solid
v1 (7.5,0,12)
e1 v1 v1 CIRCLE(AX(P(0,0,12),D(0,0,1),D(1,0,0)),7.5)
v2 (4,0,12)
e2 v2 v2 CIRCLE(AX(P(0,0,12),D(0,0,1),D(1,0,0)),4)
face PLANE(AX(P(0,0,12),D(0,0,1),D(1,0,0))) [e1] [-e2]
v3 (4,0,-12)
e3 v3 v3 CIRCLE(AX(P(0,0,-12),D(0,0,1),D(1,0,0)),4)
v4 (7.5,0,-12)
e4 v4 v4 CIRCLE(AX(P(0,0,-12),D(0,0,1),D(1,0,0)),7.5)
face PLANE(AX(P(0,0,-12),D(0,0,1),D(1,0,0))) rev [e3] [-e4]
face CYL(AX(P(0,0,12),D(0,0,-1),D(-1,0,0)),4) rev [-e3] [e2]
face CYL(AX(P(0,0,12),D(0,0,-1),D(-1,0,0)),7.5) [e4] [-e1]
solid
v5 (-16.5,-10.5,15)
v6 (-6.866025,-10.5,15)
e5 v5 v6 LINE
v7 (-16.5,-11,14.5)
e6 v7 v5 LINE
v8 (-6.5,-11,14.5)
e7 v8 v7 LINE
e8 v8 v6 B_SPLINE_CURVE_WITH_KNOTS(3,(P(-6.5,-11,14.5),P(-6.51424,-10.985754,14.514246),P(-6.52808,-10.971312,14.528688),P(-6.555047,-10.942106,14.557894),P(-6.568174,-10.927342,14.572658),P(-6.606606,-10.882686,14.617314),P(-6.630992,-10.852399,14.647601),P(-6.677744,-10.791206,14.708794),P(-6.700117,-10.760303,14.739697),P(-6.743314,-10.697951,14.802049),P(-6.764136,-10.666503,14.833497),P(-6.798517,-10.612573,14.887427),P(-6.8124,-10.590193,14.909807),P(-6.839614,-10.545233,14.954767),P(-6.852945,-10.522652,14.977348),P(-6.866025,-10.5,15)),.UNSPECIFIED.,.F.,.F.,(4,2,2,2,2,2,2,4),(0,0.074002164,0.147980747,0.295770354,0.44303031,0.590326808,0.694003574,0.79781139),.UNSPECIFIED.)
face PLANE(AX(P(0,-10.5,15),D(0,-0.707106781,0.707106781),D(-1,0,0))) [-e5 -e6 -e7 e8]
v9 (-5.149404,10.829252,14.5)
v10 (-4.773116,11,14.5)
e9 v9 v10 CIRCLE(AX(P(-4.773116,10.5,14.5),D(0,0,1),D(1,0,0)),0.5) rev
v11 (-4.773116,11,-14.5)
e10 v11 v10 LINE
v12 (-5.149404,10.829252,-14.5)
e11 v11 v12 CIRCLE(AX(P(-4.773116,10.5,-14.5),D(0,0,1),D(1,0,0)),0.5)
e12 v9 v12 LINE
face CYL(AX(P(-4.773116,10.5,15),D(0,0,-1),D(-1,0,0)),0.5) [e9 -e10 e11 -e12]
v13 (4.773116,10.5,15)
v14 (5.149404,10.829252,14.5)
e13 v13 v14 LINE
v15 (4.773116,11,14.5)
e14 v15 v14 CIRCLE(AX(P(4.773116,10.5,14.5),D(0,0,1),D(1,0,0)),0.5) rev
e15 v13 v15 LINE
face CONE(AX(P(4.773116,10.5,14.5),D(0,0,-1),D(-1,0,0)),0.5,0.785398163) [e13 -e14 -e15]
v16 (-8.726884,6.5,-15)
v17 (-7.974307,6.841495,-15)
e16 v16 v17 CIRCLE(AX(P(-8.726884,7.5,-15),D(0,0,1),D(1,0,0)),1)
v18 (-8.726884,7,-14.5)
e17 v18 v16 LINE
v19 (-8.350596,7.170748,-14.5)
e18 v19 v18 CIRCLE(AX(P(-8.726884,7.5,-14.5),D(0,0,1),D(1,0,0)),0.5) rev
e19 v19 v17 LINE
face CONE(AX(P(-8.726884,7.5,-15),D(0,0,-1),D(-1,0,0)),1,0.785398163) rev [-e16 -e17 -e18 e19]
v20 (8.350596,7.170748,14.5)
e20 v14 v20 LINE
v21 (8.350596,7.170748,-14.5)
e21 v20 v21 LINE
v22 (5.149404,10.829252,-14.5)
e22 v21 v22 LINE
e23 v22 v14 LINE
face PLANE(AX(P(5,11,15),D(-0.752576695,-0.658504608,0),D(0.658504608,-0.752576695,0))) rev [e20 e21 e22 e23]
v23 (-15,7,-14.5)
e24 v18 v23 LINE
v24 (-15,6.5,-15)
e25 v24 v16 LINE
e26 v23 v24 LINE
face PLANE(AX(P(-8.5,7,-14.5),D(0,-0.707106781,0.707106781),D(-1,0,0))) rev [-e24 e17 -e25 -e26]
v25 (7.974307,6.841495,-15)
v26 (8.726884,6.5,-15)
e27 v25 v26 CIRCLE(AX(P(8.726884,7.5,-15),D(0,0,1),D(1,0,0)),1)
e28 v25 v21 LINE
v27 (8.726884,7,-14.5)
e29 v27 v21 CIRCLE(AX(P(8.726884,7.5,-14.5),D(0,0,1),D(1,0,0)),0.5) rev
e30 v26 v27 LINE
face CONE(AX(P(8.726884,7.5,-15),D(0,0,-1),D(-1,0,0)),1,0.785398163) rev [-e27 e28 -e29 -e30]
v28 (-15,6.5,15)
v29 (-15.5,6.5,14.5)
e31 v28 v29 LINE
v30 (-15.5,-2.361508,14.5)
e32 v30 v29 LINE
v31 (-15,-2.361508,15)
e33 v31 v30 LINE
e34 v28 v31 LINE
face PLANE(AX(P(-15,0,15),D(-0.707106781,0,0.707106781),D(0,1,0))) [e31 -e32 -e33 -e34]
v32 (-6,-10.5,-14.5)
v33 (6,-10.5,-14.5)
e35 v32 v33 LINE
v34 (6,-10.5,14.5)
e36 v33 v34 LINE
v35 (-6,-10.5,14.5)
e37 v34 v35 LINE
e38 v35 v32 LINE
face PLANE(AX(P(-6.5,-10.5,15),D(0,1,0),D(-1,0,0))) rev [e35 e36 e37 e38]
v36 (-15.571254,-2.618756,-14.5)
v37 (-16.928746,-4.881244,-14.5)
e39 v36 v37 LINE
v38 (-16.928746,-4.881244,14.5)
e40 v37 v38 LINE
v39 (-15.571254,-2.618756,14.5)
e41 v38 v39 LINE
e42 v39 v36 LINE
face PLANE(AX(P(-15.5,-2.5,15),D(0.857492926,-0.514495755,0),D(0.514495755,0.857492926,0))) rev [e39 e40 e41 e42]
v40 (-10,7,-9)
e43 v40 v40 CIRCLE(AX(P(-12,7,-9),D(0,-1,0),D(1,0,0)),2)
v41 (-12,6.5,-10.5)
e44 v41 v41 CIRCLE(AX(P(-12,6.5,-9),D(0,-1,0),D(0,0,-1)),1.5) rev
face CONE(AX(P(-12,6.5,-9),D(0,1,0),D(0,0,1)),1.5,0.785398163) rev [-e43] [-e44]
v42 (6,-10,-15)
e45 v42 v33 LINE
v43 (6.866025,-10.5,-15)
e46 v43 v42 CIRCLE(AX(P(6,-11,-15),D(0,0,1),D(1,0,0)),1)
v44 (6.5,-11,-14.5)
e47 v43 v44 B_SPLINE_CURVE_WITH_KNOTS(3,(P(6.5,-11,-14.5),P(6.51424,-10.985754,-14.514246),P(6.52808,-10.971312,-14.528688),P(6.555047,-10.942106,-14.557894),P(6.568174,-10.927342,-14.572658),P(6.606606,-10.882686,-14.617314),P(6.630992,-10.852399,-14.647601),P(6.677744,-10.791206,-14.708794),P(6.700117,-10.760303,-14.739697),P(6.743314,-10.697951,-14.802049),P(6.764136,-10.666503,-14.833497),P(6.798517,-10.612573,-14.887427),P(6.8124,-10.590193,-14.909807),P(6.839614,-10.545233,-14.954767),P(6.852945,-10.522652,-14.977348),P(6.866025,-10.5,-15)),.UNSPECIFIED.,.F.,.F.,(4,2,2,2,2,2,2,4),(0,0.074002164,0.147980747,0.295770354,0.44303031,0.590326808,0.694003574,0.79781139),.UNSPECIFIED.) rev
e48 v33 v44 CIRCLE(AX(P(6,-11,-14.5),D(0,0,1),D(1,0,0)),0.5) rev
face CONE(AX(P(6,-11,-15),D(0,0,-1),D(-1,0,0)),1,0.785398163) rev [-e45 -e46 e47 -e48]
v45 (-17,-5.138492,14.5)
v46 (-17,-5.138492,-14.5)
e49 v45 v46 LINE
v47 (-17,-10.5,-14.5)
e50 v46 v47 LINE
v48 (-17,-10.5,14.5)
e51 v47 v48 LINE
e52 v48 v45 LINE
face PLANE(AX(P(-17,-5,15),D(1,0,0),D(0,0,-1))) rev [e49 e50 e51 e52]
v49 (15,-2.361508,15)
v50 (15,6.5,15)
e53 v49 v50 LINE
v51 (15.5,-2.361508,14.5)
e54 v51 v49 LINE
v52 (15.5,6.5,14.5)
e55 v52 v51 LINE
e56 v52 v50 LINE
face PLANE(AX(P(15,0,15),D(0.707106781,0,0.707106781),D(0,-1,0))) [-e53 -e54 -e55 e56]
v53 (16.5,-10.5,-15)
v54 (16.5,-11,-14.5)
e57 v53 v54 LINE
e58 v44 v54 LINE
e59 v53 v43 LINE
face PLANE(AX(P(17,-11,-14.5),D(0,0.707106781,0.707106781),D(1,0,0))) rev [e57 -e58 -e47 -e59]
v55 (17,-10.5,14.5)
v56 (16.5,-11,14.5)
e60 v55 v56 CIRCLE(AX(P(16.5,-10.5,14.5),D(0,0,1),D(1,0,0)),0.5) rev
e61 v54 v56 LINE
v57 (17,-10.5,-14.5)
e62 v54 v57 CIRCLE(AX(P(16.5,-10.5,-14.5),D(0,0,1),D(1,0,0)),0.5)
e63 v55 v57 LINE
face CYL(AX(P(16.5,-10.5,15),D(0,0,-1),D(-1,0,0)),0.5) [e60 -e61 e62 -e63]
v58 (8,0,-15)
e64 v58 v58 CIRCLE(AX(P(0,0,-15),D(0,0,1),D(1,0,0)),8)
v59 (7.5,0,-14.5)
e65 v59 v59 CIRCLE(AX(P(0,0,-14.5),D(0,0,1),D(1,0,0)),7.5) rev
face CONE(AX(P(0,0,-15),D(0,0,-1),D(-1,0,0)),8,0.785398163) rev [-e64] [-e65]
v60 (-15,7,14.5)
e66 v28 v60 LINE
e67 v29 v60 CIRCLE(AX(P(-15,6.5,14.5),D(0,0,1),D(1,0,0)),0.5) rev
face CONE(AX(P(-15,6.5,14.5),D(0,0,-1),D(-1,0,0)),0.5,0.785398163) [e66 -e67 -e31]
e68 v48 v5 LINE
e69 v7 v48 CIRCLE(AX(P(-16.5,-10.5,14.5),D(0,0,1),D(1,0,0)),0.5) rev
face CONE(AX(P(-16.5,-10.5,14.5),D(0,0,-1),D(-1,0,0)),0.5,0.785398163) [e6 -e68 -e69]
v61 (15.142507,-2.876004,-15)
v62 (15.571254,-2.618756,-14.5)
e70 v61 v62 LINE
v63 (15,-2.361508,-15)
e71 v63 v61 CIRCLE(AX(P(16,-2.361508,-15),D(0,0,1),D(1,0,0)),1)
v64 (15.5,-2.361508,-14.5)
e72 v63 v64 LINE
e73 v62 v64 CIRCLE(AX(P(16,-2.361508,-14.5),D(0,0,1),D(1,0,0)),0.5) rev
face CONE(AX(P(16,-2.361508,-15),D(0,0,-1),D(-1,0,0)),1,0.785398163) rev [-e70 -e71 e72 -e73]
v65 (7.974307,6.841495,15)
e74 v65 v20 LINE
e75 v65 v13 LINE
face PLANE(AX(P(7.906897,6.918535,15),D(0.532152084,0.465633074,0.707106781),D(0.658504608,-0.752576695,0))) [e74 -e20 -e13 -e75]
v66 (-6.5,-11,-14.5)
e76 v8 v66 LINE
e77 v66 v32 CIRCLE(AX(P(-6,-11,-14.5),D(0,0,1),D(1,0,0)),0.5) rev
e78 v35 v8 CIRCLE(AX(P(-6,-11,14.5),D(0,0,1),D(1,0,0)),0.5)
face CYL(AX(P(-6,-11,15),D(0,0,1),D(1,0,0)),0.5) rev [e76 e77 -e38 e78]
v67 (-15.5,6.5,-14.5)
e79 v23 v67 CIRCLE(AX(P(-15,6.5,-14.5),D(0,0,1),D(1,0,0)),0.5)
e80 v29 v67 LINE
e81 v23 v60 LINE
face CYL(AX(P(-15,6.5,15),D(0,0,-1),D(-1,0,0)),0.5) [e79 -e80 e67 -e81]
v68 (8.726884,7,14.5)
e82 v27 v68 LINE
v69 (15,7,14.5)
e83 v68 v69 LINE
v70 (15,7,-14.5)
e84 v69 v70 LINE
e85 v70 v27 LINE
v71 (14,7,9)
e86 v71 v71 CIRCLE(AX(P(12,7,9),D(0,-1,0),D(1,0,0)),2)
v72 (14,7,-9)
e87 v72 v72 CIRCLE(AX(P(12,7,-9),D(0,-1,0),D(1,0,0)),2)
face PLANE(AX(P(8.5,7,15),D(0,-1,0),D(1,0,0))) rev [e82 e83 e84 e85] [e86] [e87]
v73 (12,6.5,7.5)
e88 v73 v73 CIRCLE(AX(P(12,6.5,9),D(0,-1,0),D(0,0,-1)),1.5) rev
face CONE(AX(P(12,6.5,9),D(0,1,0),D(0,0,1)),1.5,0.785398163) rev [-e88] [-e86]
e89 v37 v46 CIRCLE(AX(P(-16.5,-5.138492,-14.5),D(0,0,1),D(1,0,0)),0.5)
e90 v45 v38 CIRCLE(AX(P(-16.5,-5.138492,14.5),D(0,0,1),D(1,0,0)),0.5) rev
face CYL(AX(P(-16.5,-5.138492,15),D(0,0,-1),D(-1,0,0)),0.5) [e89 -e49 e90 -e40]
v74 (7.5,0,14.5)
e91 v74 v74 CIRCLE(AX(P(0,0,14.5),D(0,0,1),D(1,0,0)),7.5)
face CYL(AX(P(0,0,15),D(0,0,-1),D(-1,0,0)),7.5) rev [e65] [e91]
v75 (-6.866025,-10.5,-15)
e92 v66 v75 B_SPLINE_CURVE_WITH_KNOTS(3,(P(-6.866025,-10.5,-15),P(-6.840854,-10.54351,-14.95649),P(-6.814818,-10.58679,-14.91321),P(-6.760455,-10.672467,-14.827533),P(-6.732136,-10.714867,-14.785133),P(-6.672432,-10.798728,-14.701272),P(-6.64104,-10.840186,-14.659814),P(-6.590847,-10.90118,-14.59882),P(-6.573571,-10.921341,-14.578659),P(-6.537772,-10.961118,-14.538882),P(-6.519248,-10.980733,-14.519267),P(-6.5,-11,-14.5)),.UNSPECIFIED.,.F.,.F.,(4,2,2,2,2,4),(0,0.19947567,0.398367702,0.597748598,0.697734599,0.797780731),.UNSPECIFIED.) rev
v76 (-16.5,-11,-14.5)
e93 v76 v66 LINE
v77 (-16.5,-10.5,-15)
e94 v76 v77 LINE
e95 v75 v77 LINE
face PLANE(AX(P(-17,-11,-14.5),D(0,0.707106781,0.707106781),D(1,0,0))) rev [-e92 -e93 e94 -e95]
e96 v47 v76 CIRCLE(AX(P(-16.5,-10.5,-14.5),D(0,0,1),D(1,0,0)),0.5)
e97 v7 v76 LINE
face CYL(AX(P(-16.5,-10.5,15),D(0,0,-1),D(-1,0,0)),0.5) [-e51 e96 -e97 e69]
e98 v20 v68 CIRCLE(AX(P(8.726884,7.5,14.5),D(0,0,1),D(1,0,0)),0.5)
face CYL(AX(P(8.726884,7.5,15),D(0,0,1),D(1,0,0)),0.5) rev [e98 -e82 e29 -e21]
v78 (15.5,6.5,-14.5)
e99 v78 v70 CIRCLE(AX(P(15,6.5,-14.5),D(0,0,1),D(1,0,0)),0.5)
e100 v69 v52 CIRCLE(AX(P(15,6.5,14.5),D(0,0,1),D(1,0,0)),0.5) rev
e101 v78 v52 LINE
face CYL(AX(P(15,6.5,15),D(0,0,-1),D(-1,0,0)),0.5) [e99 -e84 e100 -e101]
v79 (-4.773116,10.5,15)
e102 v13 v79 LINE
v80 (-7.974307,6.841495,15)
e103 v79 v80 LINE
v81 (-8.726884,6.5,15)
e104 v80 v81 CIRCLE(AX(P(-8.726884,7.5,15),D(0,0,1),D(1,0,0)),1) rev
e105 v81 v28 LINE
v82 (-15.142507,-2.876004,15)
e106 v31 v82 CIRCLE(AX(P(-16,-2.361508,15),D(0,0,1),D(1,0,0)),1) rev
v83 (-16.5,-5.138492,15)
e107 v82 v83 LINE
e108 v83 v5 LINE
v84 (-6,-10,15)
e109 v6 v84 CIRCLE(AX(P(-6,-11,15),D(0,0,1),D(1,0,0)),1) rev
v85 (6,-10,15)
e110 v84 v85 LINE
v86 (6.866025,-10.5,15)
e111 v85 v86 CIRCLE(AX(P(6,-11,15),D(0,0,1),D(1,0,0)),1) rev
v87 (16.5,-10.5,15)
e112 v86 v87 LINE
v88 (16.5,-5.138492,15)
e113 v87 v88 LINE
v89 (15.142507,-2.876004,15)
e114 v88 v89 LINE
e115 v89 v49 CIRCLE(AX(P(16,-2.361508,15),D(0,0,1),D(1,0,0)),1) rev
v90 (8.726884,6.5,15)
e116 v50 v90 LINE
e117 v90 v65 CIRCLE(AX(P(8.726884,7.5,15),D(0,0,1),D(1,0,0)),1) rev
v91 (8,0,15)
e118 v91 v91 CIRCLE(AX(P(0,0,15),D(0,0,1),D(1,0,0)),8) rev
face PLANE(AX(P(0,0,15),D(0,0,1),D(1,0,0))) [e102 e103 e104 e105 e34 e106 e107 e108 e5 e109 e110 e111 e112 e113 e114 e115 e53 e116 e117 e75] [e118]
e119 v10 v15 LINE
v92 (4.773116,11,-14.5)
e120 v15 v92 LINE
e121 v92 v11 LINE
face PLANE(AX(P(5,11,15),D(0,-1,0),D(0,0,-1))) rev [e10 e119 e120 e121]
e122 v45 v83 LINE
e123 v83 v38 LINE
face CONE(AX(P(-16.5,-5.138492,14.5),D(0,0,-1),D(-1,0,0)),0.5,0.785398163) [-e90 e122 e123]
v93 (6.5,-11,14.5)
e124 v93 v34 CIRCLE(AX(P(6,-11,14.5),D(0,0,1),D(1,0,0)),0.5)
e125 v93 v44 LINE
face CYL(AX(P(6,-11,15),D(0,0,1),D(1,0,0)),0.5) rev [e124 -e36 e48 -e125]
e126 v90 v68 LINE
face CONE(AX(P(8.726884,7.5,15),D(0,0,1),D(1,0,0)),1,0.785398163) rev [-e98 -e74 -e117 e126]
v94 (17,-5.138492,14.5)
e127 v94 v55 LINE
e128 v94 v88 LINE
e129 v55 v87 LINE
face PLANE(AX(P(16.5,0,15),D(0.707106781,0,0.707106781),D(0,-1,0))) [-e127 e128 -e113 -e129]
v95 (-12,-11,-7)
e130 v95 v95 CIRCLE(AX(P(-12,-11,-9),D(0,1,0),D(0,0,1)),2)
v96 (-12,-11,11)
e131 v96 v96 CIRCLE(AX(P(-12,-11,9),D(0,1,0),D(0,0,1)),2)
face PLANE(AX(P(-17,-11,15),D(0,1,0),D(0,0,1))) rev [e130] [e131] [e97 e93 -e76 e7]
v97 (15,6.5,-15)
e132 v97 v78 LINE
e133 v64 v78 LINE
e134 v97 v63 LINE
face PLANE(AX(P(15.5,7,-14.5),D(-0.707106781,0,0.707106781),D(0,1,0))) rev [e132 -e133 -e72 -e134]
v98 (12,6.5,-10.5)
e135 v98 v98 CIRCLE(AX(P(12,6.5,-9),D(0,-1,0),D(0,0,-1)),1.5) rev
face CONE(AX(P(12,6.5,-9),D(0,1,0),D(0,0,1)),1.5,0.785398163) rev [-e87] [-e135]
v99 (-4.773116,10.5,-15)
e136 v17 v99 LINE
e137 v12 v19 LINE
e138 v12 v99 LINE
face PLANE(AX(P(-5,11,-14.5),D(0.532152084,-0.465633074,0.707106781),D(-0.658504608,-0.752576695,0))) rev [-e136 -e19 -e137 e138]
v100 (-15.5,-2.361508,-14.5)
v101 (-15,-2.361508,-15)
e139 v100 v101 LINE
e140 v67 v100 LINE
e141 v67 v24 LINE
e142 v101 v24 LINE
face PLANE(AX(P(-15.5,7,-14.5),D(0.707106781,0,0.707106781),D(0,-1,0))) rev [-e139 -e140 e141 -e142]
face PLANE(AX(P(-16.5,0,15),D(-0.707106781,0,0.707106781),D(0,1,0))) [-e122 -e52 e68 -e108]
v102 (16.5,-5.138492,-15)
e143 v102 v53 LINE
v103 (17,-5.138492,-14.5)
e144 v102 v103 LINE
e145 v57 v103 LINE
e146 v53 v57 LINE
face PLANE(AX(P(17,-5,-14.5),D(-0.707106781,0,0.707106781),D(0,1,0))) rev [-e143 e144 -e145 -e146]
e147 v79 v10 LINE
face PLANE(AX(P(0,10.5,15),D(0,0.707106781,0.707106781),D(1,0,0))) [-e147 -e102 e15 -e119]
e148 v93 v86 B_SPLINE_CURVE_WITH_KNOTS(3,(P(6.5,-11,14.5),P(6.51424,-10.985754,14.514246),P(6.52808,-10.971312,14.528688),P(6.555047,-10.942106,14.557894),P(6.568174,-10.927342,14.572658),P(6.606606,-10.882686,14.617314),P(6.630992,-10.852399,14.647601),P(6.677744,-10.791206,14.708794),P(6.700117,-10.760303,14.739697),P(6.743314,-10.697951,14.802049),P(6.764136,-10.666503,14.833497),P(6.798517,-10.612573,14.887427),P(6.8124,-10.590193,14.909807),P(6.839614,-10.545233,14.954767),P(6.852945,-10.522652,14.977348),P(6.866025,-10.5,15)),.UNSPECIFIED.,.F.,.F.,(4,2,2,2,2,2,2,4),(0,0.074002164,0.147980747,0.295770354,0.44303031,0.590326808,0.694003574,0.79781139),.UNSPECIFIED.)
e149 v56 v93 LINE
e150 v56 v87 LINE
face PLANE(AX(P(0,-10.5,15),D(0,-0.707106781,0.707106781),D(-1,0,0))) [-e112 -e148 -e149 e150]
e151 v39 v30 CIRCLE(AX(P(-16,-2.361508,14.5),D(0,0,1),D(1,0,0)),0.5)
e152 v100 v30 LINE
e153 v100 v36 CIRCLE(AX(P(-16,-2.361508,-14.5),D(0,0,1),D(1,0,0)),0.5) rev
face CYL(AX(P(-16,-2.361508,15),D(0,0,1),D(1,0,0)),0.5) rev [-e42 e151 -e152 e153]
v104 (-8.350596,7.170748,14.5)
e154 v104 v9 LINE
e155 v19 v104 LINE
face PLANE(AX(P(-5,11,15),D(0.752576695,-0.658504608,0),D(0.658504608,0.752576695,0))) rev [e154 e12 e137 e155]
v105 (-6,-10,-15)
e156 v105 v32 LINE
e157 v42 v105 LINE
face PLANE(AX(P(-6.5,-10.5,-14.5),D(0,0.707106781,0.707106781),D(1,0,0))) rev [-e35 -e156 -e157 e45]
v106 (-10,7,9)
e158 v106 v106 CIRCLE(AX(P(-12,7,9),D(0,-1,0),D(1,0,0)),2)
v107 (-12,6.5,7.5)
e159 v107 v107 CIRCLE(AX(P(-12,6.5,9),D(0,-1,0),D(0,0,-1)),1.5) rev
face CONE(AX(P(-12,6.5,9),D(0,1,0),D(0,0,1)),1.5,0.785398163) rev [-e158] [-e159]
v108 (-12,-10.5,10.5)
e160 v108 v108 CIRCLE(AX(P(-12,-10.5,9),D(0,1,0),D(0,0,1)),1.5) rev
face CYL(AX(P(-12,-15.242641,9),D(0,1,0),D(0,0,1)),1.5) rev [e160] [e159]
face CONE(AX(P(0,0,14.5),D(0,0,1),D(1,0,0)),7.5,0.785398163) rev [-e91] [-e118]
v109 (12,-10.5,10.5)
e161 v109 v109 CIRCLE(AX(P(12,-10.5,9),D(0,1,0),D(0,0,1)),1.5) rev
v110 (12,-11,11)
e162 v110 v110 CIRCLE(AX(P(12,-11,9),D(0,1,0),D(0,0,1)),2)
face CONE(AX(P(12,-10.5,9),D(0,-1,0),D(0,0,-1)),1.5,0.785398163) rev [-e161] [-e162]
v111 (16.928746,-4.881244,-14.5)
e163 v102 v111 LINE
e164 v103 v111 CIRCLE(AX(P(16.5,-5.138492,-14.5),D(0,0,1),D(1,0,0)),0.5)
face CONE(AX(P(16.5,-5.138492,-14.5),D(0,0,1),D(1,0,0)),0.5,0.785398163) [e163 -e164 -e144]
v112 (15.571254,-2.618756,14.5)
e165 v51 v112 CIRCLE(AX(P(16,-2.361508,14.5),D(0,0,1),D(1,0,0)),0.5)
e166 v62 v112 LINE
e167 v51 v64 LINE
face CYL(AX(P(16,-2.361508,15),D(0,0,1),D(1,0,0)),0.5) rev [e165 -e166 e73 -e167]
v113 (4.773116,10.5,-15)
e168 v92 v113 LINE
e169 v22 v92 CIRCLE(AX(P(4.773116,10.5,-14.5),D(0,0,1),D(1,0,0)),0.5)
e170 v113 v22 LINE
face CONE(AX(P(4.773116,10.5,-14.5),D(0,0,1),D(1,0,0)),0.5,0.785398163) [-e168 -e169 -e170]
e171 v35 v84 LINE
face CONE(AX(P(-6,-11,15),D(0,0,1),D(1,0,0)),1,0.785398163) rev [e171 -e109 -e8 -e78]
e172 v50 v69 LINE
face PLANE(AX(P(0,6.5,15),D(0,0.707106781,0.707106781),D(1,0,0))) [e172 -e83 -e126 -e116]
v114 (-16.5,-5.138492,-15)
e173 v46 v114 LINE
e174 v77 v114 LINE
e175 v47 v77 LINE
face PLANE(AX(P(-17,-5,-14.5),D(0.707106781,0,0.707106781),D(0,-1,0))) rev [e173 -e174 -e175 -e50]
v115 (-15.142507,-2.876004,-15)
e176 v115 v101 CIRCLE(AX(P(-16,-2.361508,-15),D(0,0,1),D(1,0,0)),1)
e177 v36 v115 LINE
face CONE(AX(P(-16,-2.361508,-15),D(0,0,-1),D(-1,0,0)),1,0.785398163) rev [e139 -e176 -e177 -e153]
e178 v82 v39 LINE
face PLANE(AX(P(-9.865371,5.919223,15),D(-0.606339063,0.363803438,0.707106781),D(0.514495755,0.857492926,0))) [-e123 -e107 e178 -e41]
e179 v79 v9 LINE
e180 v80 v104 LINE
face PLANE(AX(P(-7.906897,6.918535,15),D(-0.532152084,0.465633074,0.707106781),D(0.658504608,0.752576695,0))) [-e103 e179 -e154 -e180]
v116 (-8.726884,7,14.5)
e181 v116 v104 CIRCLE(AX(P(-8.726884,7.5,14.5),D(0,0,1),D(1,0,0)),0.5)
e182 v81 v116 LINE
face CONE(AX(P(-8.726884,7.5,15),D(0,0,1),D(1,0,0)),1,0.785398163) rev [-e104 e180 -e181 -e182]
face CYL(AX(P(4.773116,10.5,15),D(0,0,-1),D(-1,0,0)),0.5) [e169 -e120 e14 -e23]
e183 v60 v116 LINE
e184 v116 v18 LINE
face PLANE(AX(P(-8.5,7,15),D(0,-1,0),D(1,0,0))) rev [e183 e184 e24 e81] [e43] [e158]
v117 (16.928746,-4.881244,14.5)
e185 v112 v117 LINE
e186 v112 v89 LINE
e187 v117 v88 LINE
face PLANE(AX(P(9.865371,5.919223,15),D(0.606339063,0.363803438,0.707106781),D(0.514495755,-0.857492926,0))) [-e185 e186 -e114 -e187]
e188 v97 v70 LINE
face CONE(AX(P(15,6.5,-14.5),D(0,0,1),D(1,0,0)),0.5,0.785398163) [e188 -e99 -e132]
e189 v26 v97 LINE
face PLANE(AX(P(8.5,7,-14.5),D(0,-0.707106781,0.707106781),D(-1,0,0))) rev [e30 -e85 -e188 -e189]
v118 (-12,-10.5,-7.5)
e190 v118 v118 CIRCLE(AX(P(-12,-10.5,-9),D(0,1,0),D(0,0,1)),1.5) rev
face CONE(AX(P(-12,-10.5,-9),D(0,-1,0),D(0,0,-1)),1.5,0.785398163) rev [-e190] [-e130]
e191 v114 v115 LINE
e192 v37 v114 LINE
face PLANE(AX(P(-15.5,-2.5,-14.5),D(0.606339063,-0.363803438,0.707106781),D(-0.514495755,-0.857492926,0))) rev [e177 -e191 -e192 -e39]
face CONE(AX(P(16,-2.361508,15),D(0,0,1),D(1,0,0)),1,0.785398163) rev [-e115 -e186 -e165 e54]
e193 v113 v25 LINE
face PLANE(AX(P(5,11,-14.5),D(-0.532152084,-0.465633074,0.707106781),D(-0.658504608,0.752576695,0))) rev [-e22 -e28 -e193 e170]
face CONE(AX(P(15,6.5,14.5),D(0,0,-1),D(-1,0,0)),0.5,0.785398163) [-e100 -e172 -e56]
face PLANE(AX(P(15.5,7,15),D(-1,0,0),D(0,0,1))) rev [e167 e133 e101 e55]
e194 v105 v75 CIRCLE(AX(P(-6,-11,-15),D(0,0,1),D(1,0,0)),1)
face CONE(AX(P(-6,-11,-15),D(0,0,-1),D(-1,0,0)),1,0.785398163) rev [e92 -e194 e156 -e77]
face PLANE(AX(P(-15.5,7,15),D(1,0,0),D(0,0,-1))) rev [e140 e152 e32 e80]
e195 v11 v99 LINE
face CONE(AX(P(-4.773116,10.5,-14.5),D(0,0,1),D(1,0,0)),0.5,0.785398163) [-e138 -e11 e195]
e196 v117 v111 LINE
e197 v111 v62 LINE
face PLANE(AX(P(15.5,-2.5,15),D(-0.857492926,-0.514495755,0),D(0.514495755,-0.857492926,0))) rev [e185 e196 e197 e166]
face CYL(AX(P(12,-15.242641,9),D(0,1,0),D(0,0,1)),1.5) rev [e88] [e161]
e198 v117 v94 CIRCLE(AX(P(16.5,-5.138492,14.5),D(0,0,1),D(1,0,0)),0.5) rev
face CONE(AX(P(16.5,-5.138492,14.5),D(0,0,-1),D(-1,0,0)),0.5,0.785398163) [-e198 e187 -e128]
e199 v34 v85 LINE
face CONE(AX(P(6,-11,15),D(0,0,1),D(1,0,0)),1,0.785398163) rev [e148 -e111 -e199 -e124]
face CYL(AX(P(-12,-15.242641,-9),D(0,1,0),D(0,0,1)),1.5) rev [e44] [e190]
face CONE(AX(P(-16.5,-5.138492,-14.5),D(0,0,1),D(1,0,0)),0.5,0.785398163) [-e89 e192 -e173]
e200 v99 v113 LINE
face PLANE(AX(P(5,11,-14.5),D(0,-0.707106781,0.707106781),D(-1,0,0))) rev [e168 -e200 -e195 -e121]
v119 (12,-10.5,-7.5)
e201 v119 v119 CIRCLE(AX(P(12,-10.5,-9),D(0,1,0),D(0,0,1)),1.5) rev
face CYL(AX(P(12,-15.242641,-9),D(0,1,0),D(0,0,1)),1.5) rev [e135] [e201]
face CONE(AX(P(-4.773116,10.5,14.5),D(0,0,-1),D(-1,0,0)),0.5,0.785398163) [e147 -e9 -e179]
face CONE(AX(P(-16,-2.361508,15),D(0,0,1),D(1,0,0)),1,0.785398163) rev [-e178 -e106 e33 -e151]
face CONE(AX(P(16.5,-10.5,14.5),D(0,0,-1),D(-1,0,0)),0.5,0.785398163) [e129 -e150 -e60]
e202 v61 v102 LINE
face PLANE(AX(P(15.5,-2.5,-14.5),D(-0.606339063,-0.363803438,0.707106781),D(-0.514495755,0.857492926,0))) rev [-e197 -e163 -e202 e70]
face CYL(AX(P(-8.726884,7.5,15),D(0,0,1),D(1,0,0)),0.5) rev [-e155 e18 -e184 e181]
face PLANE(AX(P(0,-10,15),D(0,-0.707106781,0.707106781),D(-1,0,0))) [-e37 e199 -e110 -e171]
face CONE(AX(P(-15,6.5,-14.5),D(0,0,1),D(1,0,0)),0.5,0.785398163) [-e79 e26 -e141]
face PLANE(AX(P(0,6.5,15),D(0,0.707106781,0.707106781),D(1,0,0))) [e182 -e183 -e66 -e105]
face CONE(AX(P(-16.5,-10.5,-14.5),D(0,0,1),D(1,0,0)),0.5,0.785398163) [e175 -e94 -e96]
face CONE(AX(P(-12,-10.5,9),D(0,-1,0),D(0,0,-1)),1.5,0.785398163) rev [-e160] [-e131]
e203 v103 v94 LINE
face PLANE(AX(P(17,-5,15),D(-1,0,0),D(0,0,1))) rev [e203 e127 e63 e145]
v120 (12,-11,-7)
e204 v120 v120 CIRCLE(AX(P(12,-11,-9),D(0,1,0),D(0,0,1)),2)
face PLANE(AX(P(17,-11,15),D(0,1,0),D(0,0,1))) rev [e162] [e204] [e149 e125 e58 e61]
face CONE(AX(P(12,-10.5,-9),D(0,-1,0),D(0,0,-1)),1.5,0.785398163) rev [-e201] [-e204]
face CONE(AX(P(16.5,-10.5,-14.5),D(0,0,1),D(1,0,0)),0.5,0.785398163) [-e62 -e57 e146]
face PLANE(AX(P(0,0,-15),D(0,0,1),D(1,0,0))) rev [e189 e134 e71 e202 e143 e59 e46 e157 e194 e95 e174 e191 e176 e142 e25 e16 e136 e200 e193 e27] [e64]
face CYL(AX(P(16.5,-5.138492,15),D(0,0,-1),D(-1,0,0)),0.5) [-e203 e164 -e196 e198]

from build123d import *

# Parameters (mm, degrees)
SKETCH2_R           = 7.5
BOSS_EXTRUDE1_DEPTH = 15
SKETCH3_R           = 7.5
SKETCH3_R_2         = 4
BOSS_EXTRUDE2_DEPTH = 12
SKETCH4_R           = 1.5
CUT_EXTRUDE1_DEPTH  = 18
FILLET1_R           = 0.5
CHAMFER1_SIZE       = 0.5


with BuildPart() as part:
    # Sketch2 → Boss-Extrude1 (new, symmetric)
    with BuildSketch(Plane.XY):
        Polygon((5, 11), (-5, 11), (-8.5, 7), (-15.5, 7), (-15.5, -2.5), (-17, -5), (-17, -11), (-6.5, -11), (-6.5, -10.5), (6.5, -10.5), (6.5, -11), (17, -11), (17, -5), (15.5, -2.5), (15.5, 7), (8.5, 7), align=None)
        Circle(SKETCH2_R, mode=Mode.SUBTRACT)
    extrude(amount=BOSS_EXTRUDE1_DEPTH, both=True)

    # Sketch4 → Cut-Extrude1 (cut)
    with BuildSketch(Plane(origin=(0, 7, 0), x_dir=(1, 0, 0), z_dir=(0, 1, 0))):
        with Locations(Location((-12, 9, 0), (0, 0, 270))):
            Circle(SKETCH4_R)
        with Locations(Location((12, 9, 0), (0, 0, 270))):
            Circle(SKETCH4_R)
        with Locations(Location((-12, -9, 0), (0, 0, 270))):
            Circle(SKETCH4_R)
        with Locations(Location((12, -9, 0), (0, 0, 270))):
            Circle(SKETCH4_R)
    extrude(amount=-CUT_EXTRUDE1_DEPTH, mode=Mode.SUBTRACT)

    # Fillet1
    fillet1_edges = [part.edges().sort_by_distance(p)[0] for p in [
        (6.5, -10.5, 0),
        (-6.5, -10.5, 0),
        (-17, -11, 0),
        (-17, -5, 0),
        (-15.5, -2.5, 0),
        (-15.5, 7, 0),
        (-8.5, 7, 0),
        (-5, 11, 0),
        (5, 11, 0),
        (8.5, 7, 0),
        (17, -11, 0),
        (17, -5, 0),
        (15.5, -2.5, 0),
        (15.5, 7, 0),
    ]]
    fillet(fillet1_edges, radius=FILLET1_R - 0.0001)  # a hair under: the kernel refuses the full size

    # Chamfer1
    chamfer1_edges = [part.edges().sort_by_distance(p)[0] for p in [
        (12, 7, 7.5),
    ]]
    chamfer(chamfer1_edges, length=CHAMFER1_SIZE)
    chamfer1_2_edges = [part.edges().sort_by_distance(p)[0] for p in [
        (12, -11, 7.5),
    ]]
    chamfer(chamfer1_2_edges, length=CHAMFER1_SIZE)
    chamfer1_3_edges = [part.edges().sort_by_distance(p)[0] for p in [
        (12, 7, -10.5),
    ]]
    chamfer(chamfer1_3_edges, length=CHAMFER1_SIZE)
    chamfer1_4_edges = [part.edges().sort_by_distance(p)[0] for p in [
        (-12, 7, -10.5),
    ]]
    chamfer(chamfer1_4_edges, length=CHAMFER1_SIZE)
    chamfer1_5_edges = [part.edges().sort_by_distance(p)[0] for p in [
        (-12, 7, 7.5),
    ]]
    chamfer(chamfer1_5_edges, length=CHAMFER1_SIZE)
    chamfer1_6_edges = [part.edges().sort_by_distance(p)[0] for p in [
        (12, -11, -10.5),
    ]]
    chamfer(chamfer1_6_edges, length=CHAMFER1_SIZE)
    chamfer1_7_edges = [part.edges().sort_by_distance(p)[0] for p in [
        (-12, -11, -10.5),
    ]]
    chamfer(chamfer1_7_edges, length=CHAMFER1_SIZE)
    chamfer1_8_edges = [part.edges().sort_by_distance(p)[0] for p in [
        (-12, -11, 7.5),
    ]]
    chamfer(chamfer1_8_edges, length=CHAMFER1_SIZE)
    chamfer1_9_edges = [part.edges().sort_by_distance(p)[0] for p in [
        (6.5, -10.99995, -15),
        (-6.5, -10.99995, -15),
        (6.35358268, -10.64641732, -15),
        (-6.35358268, -10.64641732, -15),
        (0, -10.5, -15),
    ]]
    chamfer(chamfer1_9_edges, length=CHAMFER1_SIZE)
    chamfer1_10_edges = [part.edges().sort_by_distance(p)[0] for p in [
        (6.5, -10.99995, 15),
        (-6.5, -10.99995, 15),
        (6.35358268, -10.64641732, 15),
        (-6.35358268, -10.64641732, 15),
        (0, -10.5, 15),
    ]]
    chamfer(chamfer1_10_edges, length=CHAMFER1_SIZE)
    chamfer1_11_edges = [part.edges().sort_by_distance(p)[0] for p in [
        (-7.5, 0, -15),
    ]]
    chamfer(chamfer1_11_edges, length=CHAMFER1_SIZE)
    chamfer1_12_edges = [part.edges().sort_by_distance(p)[0] for p in [
        (-7.5, 0, 15),
    ]]
    chamfer(chamfer1_12_edges, length=CHAMFER1_SIZE)
    chamfer1_13_edges = [part.edges().sort_by_distance(p)[0] for p in [
        (0, 11, -15),
        (4.979728083, 10.955325394, -15),
        (-4.979728083, 10.955325394, -15),
        (6.75, 9, -15),
        (-6.75, 9, -15),
        (8.520271917, 7.044674606, -15),
        (-8.520271917, 7.044674606, -15),
        (11.863469368, 7, -15),
        (-11.863469368, 7, -15),
        (15.35358268, 6.85358268, -15),
        (-15.35358268, 6.85358268, -15),
        (15.5, 2.069282142, -15),
        (-15.5, 2.069282142, -15),
        (15.518138907, -2.494975814, -15),
        (-15.518138907, -2.494975814, -15),
        (16.25, -3.75, -15),
        (-16.25, -3.75, -15),
        (16.981861093, -5.005024186, -15),
        (-16.981861093, -5.005024186, -15),
        (17, -7.819282142, -15),
        (-17, -7.819282142, -15),
        (16.85358268, -10.85358268, -15),
        (-16.85358268, -10.85358268, -15),
        (11.75005, -11, -15),
        (-11.75005, -11, -15),
    ]]
    chamfer(chamfer1_13_edges, length=CHAMFER1_SIZE - 0.0004)  # a hair under: the kernel refuses the full size
    chamfer1_14_edges = [part.edges().sort_by_distance(p)[0] for p in [
        (0, 11, 15),
        (4.979728083, 10.955325394, 15),
        (-4.979728083, 10.955325394, 15),
        (6.75, 9, 15),
        (-6.75, 9, 15),
        (8.520271917, 7.044674606, 15),
        (-8.520271917, 7.044674606, 15),
        (11.863469368, 7, 15),
        (-11.863469368, 7, 15),
        (15.35358268, 6.85358268, 15),
        (-15.35358268, 6.85358268, 15),
        (15.5, 2.069282142, 15),
        (-15.5, 2.069282142, 15),
        (15.518138907, -2.494975814, 15),
        (-15.518138907, -2.494975814, 15),
        (16.25, -3.75, 15),
        (-16.25, -3.75, 15),
        (16.981861093, -5.005024186, 15),
        (-16.981861093, -5.005024186, 15),
        (17, -7.819282142, 15),
        (-17, -7.819282142, 15),
        (16.85358268, -10.85358268, 15),
        (-16.85358268, -10.85358268, 15),
        (11.75005, -11, 15),
        (-11.75005, -11, 15),
    ]]
    chamfer(chamfer1_14_edges, length=CHAMFER1_SIZE - 0.0004)  # a hair under: the kernel refuses the full size


with BuildPart() as body_2:
    # Sketch3 → Boss-Extrude2 (new, symmetric)
    with BuildSketch(Plane.XY):
        Circle(SKETCH3_R)
        Circle(SKETCH3_R_2, mode=Mode.SUBTRACT)
    extrude(amount=BOSS_EXTRUDE2_DEPTH, both=True)


solid = Compound([part.part, body_2.part])
